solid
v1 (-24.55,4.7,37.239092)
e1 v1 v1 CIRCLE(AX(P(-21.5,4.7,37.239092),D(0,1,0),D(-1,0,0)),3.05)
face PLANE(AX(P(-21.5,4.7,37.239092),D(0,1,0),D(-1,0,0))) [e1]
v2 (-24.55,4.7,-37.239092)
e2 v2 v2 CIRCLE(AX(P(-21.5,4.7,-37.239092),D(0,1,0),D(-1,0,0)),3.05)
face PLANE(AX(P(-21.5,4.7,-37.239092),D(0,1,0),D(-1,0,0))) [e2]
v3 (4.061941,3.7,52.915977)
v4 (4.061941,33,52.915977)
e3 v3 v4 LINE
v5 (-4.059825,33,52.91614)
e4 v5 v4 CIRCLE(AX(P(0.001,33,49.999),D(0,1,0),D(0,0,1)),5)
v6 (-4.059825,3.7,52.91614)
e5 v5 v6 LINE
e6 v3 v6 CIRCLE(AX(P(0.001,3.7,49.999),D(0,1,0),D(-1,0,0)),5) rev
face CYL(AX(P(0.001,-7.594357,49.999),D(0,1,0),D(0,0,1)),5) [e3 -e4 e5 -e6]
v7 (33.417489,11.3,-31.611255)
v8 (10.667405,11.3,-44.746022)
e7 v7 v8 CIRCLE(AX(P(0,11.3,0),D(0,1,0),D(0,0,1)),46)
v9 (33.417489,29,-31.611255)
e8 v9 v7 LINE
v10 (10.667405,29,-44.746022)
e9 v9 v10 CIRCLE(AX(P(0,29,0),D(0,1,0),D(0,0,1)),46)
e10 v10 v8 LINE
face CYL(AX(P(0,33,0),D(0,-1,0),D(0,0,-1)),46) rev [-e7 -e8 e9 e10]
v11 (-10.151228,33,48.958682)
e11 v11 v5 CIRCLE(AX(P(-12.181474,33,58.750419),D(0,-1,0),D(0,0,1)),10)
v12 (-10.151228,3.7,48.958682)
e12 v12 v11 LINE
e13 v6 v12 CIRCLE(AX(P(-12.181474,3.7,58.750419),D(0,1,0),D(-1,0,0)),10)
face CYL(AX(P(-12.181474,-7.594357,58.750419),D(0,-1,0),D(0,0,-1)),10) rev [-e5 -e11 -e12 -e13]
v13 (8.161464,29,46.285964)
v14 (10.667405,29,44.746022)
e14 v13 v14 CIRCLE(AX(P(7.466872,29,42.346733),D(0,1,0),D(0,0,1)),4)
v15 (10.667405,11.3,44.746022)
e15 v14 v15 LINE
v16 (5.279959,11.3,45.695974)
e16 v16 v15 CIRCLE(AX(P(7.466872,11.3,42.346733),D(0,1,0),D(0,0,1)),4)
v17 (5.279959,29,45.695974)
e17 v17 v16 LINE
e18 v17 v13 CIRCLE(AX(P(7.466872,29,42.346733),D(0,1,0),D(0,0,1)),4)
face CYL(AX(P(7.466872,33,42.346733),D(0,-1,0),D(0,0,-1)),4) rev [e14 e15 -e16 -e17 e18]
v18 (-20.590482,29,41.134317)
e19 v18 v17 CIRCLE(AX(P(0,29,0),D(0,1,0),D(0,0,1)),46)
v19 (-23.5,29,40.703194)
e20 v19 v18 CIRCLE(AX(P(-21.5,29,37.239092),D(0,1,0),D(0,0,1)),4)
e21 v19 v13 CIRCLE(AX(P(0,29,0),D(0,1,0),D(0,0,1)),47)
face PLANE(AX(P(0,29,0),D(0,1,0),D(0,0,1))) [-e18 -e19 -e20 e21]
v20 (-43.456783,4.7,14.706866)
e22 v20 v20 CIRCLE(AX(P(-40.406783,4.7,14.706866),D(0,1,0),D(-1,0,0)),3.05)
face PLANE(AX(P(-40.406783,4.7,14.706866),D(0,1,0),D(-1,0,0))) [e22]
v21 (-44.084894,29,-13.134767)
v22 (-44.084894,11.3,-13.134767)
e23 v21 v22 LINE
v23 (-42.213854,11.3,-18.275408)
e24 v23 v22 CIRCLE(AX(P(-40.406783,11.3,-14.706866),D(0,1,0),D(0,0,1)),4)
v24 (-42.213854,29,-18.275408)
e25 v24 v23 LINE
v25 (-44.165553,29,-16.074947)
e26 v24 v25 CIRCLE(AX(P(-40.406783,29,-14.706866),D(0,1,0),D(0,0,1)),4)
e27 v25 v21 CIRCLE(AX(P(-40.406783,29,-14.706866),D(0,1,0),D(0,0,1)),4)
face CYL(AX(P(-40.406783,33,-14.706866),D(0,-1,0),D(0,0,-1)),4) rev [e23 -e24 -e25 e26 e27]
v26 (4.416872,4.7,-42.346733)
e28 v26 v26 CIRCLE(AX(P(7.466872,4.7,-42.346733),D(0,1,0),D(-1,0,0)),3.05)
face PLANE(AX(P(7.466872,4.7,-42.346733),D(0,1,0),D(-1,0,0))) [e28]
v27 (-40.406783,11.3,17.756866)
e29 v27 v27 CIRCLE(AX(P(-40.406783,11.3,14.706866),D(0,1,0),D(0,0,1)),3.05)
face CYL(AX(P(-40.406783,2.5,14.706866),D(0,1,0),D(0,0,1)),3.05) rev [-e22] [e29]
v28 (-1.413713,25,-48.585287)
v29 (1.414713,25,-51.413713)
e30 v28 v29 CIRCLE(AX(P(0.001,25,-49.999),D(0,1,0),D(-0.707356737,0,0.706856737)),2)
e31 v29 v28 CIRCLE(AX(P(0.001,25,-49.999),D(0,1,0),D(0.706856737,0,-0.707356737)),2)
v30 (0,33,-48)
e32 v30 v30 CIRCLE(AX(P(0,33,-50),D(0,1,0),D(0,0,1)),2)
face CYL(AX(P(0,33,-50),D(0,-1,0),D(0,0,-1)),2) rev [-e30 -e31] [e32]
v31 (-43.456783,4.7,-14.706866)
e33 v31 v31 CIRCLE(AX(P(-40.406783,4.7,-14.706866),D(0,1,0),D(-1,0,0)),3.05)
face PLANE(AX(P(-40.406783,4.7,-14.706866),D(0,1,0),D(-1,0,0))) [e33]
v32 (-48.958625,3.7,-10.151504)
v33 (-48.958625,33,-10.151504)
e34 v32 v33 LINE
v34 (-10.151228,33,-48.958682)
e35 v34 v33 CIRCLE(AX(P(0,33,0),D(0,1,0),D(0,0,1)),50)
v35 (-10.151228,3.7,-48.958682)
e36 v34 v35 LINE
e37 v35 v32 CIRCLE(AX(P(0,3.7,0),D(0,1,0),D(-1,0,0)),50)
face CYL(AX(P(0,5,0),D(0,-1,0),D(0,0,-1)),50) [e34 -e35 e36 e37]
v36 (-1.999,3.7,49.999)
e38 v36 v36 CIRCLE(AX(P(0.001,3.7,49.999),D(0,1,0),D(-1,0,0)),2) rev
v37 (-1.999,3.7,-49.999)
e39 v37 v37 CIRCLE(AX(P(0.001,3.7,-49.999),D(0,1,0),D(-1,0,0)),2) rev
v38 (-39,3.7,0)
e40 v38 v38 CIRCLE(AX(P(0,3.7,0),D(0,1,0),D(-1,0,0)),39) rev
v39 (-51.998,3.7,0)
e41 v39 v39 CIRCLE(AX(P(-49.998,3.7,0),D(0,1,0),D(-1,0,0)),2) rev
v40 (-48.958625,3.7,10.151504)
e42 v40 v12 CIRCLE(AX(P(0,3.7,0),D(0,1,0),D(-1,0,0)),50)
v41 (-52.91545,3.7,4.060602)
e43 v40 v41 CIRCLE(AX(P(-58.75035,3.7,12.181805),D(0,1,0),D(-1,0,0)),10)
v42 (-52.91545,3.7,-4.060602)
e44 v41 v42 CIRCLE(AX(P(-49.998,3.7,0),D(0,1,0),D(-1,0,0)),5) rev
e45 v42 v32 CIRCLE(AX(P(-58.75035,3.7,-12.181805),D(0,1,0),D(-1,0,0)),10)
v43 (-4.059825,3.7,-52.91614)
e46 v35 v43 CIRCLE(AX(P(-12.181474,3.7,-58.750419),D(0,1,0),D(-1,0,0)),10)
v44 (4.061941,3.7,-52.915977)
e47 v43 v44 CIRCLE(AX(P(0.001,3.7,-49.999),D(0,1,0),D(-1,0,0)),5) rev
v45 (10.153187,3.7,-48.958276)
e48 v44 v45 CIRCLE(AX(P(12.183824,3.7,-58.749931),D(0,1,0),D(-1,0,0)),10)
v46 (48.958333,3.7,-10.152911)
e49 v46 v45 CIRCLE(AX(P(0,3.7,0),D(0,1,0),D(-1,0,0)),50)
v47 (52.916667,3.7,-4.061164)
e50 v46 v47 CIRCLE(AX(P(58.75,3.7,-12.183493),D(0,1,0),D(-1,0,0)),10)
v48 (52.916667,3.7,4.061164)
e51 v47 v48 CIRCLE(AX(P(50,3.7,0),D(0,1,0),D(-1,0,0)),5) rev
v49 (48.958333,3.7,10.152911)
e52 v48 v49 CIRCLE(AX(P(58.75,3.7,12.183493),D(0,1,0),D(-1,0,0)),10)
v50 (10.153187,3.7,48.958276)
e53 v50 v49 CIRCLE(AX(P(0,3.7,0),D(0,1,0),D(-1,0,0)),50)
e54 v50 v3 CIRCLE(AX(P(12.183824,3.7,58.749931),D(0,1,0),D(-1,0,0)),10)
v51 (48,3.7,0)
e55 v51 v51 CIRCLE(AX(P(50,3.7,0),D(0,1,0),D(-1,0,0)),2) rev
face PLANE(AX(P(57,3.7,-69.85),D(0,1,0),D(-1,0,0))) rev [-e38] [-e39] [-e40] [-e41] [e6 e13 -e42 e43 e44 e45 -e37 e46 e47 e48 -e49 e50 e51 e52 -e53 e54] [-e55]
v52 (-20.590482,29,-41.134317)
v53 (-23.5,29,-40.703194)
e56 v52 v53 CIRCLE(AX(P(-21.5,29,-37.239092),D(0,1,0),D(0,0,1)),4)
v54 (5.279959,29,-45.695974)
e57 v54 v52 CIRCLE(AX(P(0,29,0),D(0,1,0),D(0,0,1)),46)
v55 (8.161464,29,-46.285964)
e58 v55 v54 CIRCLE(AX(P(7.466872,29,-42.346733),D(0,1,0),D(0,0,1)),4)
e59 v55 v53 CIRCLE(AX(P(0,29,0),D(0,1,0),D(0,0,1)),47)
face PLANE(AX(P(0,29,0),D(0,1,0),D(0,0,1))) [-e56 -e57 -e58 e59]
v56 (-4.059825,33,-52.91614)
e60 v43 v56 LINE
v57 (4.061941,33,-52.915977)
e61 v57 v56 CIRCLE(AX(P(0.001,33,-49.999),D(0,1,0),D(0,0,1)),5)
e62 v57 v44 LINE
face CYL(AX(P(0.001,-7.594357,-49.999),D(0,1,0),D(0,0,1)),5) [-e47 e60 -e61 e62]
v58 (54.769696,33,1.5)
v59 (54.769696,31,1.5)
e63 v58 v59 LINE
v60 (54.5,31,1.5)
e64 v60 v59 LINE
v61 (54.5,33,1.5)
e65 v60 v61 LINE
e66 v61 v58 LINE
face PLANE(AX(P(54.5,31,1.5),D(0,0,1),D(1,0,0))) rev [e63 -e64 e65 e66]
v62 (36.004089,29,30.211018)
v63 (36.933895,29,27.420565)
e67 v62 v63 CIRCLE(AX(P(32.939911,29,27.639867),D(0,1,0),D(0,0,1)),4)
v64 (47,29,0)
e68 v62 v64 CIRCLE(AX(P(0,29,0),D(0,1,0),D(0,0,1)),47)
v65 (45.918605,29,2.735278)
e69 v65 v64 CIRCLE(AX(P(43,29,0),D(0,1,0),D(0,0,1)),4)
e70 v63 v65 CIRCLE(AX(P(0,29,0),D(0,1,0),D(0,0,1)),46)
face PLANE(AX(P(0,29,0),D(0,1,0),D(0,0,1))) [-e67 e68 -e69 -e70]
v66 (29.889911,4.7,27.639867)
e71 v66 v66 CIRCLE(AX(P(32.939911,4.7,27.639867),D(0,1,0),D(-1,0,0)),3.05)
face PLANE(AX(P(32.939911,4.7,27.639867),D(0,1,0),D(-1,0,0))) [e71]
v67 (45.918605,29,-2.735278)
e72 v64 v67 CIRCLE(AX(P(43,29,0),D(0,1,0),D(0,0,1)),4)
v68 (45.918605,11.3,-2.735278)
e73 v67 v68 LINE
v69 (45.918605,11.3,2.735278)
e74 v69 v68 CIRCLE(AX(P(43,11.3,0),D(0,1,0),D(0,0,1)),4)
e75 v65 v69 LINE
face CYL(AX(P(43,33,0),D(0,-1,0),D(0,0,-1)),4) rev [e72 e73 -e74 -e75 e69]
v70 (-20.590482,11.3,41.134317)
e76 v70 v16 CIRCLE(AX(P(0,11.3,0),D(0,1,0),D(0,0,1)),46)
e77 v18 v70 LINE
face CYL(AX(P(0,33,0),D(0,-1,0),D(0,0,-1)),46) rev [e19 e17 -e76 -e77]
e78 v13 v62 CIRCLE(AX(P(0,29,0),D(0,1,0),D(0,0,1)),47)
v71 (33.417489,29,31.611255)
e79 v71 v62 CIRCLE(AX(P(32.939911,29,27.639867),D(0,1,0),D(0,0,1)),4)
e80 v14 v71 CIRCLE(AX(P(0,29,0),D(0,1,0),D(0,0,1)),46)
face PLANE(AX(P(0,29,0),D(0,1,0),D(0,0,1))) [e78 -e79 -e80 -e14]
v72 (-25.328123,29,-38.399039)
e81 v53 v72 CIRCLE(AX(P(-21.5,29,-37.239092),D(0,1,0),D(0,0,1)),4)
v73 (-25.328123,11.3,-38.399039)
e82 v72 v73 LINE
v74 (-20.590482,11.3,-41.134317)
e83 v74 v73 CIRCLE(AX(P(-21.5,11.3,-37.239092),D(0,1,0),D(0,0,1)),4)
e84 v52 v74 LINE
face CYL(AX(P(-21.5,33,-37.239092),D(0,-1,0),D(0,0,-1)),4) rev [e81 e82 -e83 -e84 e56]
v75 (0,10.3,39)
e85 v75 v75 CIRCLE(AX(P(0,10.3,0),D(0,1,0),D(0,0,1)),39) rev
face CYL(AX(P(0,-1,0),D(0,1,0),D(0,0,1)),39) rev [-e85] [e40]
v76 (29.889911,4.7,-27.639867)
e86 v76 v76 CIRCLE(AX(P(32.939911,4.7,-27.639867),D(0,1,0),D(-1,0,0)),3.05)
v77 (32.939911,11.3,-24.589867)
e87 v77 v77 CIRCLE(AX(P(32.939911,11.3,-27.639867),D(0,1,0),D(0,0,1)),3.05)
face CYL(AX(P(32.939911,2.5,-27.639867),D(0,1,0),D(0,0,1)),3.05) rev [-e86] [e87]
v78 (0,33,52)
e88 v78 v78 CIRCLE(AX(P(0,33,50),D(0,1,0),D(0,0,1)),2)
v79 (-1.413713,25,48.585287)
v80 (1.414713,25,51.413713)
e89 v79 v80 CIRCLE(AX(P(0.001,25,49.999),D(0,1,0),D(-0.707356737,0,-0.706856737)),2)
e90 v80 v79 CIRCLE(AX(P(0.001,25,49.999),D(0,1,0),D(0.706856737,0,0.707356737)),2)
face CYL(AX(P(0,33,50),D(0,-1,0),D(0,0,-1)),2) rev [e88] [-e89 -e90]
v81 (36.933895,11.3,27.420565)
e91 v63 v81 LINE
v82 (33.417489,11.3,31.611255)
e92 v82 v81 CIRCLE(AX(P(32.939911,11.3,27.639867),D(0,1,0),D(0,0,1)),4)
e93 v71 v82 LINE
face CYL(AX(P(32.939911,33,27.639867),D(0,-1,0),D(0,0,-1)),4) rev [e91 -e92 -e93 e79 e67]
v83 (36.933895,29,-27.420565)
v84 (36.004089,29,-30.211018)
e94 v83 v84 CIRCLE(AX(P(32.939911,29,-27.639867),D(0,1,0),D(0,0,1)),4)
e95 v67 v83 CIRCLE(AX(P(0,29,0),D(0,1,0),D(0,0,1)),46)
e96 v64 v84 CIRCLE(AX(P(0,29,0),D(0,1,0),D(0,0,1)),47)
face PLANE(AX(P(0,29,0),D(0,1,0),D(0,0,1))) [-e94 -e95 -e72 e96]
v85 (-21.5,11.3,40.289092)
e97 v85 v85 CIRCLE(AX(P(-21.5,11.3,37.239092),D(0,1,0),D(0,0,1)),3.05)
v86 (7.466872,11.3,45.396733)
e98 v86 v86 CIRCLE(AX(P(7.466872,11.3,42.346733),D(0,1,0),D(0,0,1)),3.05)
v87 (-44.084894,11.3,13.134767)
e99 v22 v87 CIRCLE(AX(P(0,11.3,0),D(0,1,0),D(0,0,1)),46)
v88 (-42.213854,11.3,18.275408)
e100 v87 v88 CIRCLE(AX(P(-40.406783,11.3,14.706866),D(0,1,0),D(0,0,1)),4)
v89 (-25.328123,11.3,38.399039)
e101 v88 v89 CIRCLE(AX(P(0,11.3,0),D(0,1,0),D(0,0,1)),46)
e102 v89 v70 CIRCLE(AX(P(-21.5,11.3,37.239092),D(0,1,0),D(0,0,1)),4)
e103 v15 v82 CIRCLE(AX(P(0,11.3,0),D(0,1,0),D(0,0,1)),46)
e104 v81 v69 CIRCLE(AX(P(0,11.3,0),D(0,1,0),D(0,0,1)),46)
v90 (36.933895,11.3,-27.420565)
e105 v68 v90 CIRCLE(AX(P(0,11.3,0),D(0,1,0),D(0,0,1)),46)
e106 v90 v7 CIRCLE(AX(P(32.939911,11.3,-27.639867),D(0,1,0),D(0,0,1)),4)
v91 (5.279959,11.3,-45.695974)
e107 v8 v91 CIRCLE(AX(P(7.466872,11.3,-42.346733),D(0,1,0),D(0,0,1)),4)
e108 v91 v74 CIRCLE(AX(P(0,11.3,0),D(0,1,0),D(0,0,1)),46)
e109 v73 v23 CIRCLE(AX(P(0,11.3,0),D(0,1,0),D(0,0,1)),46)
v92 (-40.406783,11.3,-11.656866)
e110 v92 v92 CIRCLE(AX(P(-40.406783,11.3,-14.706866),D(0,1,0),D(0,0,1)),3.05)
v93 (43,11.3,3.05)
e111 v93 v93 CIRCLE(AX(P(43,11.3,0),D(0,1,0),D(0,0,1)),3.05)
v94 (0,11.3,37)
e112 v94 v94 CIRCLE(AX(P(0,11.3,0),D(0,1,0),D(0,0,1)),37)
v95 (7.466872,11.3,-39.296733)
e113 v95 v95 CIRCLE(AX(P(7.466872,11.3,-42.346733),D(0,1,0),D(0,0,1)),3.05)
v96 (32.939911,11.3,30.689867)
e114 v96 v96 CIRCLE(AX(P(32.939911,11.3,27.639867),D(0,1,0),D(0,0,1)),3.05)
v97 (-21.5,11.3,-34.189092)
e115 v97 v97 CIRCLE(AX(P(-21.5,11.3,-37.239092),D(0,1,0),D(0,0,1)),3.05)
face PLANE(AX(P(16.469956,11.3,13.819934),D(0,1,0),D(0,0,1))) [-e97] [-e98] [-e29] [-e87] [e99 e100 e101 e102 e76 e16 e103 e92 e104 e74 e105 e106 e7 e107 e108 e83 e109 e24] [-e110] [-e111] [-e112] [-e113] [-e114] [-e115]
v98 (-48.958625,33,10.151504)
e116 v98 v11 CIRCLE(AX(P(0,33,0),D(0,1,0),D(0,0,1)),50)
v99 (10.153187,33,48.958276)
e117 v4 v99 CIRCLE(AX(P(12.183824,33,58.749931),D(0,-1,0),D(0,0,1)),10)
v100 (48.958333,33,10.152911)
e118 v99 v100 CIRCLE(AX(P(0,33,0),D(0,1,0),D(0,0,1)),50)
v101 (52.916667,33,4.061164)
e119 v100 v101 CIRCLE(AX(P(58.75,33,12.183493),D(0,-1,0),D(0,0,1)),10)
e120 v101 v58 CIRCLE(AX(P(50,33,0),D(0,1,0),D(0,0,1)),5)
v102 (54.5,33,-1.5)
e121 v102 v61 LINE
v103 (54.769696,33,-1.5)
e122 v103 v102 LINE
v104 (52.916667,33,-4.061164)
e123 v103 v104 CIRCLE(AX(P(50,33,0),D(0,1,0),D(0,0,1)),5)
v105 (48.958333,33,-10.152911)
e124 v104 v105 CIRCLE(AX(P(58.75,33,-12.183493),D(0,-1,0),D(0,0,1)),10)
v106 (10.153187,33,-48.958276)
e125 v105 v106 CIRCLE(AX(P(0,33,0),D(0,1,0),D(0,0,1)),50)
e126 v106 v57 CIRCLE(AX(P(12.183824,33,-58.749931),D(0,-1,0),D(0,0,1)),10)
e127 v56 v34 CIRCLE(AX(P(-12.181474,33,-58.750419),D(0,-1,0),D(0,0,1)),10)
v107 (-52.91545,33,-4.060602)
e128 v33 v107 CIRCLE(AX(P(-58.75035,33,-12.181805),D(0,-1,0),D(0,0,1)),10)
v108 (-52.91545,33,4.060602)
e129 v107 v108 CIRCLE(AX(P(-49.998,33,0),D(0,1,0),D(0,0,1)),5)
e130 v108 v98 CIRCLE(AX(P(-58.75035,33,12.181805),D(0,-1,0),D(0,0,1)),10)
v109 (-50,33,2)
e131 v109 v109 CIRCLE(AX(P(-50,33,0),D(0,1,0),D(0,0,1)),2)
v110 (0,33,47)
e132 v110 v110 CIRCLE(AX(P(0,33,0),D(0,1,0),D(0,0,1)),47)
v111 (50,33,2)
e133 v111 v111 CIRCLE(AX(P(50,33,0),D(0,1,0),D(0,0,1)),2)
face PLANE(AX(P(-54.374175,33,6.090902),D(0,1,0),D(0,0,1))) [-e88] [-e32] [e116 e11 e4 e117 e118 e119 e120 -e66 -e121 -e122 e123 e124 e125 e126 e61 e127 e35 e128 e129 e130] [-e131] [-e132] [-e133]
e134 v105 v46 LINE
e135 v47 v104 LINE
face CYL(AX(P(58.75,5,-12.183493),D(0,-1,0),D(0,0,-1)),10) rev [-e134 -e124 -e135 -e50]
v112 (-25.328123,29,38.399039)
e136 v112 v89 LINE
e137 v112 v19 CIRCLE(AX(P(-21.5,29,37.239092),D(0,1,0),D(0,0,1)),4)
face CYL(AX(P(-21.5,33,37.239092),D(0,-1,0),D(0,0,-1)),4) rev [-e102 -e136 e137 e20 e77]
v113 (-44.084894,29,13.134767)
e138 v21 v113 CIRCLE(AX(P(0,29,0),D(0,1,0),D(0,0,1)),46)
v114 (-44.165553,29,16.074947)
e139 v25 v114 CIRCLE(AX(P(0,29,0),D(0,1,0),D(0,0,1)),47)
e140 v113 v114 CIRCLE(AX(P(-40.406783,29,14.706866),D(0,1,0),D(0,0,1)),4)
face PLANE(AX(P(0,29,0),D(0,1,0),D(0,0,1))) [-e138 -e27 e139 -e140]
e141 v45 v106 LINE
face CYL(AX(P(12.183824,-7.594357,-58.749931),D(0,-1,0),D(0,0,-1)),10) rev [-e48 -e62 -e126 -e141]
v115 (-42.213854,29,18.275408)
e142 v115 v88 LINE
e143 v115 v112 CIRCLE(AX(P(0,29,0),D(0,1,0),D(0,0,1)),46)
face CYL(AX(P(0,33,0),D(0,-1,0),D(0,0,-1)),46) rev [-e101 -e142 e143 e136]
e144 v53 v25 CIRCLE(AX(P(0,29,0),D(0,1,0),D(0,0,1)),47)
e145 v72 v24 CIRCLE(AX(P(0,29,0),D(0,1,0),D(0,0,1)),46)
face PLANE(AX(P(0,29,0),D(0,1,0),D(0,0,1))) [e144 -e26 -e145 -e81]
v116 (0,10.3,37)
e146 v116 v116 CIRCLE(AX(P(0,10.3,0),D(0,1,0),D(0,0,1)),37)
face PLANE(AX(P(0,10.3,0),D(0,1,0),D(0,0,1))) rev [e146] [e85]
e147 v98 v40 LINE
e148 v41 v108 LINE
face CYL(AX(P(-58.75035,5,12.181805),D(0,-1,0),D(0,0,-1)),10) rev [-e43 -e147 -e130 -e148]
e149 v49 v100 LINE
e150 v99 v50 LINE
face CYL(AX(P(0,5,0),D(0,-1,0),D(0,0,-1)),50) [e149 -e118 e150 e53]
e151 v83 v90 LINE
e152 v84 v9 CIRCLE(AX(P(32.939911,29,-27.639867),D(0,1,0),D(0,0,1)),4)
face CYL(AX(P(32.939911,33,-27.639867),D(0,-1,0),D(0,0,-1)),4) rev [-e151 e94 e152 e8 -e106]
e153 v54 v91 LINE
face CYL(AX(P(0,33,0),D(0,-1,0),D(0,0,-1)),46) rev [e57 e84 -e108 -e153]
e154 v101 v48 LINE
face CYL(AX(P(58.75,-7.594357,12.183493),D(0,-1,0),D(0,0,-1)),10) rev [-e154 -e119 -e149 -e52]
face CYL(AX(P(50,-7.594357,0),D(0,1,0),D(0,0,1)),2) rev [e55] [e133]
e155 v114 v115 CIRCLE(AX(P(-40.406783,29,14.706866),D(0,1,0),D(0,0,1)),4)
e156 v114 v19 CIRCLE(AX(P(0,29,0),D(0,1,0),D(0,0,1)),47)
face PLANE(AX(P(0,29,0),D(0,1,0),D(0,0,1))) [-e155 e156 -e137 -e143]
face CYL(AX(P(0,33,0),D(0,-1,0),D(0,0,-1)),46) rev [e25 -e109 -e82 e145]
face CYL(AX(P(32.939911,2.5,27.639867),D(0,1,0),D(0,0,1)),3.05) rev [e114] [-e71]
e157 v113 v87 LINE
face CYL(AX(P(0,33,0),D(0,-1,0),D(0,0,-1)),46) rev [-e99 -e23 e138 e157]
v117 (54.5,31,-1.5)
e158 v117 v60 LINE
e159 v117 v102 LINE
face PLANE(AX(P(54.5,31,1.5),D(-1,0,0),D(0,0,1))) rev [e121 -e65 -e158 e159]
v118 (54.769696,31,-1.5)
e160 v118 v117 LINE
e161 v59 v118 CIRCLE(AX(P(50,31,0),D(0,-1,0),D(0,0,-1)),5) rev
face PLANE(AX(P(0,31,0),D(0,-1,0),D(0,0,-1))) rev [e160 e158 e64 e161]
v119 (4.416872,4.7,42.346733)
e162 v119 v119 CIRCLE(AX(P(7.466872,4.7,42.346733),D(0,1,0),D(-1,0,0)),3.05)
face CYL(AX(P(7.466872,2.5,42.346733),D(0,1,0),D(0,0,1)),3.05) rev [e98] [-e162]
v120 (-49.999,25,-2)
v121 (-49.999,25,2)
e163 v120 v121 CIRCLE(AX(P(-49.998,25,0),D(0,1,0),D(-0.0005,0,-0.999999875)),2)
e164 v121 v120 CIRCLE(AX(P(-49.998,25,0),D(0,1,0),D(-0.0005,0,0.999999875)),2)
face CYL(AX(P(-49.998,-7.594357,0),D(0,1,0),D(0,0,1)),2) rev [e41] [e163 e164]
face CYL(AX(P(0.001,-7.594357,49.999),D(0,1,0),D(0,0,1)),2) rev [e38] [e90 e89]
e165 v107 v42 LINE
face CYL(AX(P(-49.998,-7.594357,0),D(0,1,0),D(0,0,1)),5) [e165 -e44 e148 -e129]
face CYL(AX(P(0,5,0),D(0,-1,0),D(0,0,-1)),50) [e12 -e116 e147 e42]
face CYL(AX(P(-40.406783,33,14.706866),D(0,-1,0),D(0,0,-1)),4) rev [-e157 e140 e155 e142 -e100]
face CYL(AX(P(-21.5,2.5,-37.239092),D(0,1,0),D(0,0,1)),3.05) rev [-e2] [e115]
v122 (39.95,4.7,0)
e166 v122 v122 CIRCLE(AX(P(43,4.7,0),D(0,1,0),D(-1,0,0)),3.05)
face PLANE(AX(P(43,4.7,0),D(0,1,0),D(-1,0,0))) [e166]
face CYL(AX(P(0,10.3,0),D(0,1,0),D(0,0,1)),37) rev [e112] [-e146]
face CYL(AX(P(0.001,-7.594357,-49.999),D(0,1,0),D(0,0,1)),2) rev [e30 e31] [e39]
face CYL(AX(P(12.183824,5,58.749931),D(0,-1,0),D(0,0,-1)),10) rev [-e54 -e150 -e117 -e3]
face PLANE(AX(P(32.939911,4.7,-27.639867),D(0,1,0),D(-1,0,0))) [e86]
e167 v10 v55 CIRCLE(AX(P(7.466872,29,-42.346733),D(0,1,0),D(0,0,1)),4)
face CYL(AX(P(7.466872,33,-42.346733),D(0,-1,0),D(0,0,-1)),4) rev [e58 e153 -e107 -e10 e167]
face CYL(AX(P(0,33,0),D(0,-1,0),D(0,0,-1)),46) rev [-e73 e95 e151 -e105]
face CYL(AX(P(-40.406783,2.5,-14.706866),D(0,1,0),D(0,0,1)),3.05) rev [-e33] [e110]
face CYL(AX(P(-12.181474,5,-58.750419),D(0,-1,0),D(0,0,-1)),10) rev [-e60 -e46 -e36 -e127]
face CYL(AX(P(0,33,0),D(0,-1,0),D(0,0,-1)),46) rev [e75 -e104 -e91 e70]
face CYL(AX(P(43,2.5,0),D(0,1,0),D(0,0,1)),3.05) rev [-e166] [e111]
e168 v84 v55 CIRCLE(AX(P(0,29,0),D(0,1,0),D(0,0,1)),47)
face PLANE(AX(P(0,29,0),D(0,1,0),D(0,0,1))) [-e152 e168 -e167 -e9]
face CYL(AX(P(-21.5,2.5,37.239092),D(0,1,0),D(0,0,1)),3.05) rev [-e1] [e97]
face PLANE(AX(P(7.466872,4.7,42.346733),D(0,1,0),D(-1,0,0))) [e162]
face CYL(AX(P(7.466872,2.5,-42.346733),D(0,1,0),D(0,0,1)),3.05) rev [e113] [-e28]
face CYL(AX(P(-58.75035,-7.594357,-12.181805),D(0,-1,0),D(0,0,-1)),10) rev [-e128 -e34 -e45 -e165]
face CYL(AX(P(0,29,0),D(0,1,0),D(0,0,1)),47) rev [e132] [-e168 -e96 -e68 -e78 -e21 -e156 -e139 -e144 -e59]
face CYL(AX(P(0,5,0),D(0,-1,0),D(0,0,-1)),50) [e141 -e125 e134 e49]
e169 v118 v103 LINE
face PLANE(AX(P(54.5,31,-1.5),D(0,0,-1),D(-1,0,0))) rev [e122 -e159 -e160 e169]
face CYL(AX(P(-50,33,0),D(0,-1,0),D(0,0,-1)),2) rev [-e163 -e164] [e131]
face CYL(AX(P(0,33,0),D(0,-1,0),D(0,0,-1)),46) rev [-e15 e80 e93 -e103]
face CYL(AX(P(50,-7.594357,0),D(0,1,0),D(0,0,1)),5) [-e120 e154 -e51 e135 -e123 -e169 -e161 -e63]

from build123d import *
from build123d.topology import SkipClean

# Parameters (mm, degrees)
SKETCH1_R            = 50
BOSS_EXTRUDE1_DEPTH  = 5
SKETCH2_R            = 3
BOSS_EXTRUDE2_DEPTH  = 30
SKETCH3_R            = 50
BOSS_EXTRUDE3_DEPTH  = 28
SKETCH4_R            = 39
CUT_EXTRUDE1_DEPTH   = 6
SKETCH5_R            = 3
CUT_EXTRUDE2_DEPTH   = 44
SKETCH6_R            = 50
SKETCH6_R_2          = 39
BOSS_EXTRUDE4_DEPTH  = 3
CUT_EXTRUDE3_START   = -4
SKETCH7_R            = 47
SKETCH7_R_2          = 46
CUT_EXTRUDE3_DEPTH   = 4
BOSS_EXTRUDE5_START  = -1
SKETCH8_R            = 39
SKETCH8_R_2          = 37
BOSS_EXTRUDE5_DEPTH  = 1
SKETCH9_R            = 5
SKETCH9_R_2          = 2
BOSS_EXTRUDE6_DEPTH  = 33
SKETCH10_R           = 3.05
CUT_EXTRUDE6_DEPTH   = 2.5
SKETCH11_R           = 47.15
CUT_EXTRUDE7_DEPTH   = 4
SKETCH12_R           = 39
SKETCH12_R_2         = 3.05
BOSS_EXTRUDE7_DEPTH  = 6.3
SKETCH13_R           = 39
SKETCH13_R_2         = 37
BOSS_EXTRUDE8_DEPTH  = 1
SKETCH14_W           = 114
SKETCH14_H           = 3
CUT_EXTRUDE8_DEPTH   = 59.5
SKETCH15_R           = 39
SKETCH15_R_2         = 2
BOSS_EXTRUDE9_DEPTH  = 1
SKETCH16_R           = 3.05
BOSS_EXTRUDE10_DEPTH = 0.7
SKETCH17_W           = 114.080184059
SKETCH17_H           = 0.7
CUT_EXTRUDE9_DEPTH   = 69.85
CUT_EXTRUDE10_START  = -8
CUT_EXTRUDE10_DEPTH  = 8
CUT_EXTRUDE12_START  = -21.3
SKETCH20_R           = 57
SKETCH20_R_2         = 50
CUT_EXTRUDE12_DEPTH  = 21.3
BOSS_EXTRUDE11_START = -21.3
BOSS_EXTRUDE11_DEPTH = 21.3
CUT_EXTRUDE13_START  = -21.3
CUT_EXTRUDE13_DEPTH  = 21.3
FILLET1_R            = 10
SKETCH23_R           = 2
BOSS_EXTRUDE12_DEPTH = 8
CUT_EXTRUDE14_START  = -4
SKETCH24_R           = 47
SKETCH24_R_2         = 46
CUT_EXTRUDE14_DEPTH  = 4
SKETCH25_W           = 1
SKETCH25_H           = 3
CUT_EXTRUDE15_DEPTH  = 2


# Read off the part's stored shape, not the designer's step: Cut-Extrude13
with BuildPart() as part:
    # Sketch1 → Boss-Extrude1 (new body)
    with BuildSketch(Plane(origin=(0, 0, 0), x_dir=(1, 0, 0), z_dir=(0, 1, 0))):
        with Locations(Location((0, 0, 0), (0, 0, 270))):
            Circle(SKETCH1_R)
    extrude(amount=BOSS_EXTRUDE1_DEPTH)

    # Sketch2 → Boss-Extrude2 (add)
    with BuildSketch(Plane(origin=(0, 5, 0), x_dir=(1, 0, 0), z_dir=(0, 1, 0))):
        with Locations(Location((43, 0, 0), (0, 0, 270))):
            Circle(SKETCH2_R)
        with Locations(Location((32.939911054, -27.639867217, 0), (0, 0, 270))):
            Circle(SKETCH2_R)
        with Locations(Location((7.46687164, -42.34673338, 0), (0, 0, 270))):
            Circle(SKETCH2_R)
        with Locations(Location((-21.5, -37.239092363, 0), (0, 0, 270))):
            Circle(SKETCH2_R)
        with Locations(Location((-40.406782694, -14.706866163, 0), (0, 0, 270))):
            Circle(SKETCH2_R)
        with Locations(Location((-40.406782694, 14.706866163, 0), (0, 0, 270))):
            Circle(SKETCH2_R)
        with Locations(Location((-21.5, 37.239092363, 0), (0, 0, 270))):
            Circle(SKETCH2_R)
        with Locations(Location((7.46687164, 42.34673338, 0), (0, 0, 270))):
            Circle(SKETCH2_R)
        with Locations(Location((32.939911054, 27.639867217, 0), (0, 0, 270))):
            Circle(SKETCH2_R)
    extrude(amount=BOSS_EXTRUDE2_DEPTH)

    # Sketch3 → Boss-Extrude3 (add)
    with BuildSketch(Plane(origin=(0, 5, 0), x_dir=(1, 0, 0), z_dir=(0, 1, 0))):
        with Locations(Location((0, 0, 0), (0, 0, 270))):
            Circle(SKETCH3_R)
        with BuildLine():
            ThreePointArc((45.918604651, 2.735278211), (43.225860556, 15.732926593), (36.933894872, 27.42056545))
            ThreePointArc((36.933894872, 27.42056545), (36.004088827, 30.211017655), (33.417488986, 31.611254798))
            ThreePointArc((33.417488986, 31.611254798), (23, 39.837168574), (10.667405207, 44.746021791))
            ThreePointArc((10.667405207, 44.746021791), (8.16146435, 46.285964392), (5.27995883, 45.695973945))
            ThreePointArc((5.27995883, 45.695973945), (-7.987816173, 45.301156639), (-20.590481909, 41.13431724))
            ThreePointArc((-20.590481909, 41.13431724), (-23.5, 40.703193978), (-25.328122743, 38.399039029))
            ThreePointArc((-25.328122743, 38.399039029), (-35.238044383, 29.568230046), (-42.213853702, 18.275408495))
            ThreePointArc((-42.213853702, 18.275408495), (-44.165553177, 16.074946736), (-44.084894193, 13.134766994))
            ThreePointArc((-44.084894193, 13.134766994), (-46, 0), (-44.084894193, -13.134766994))
            ThreePointArc((-44.084894193, -13.134766994), (-44.165553177, -16.074946736), (-42.213853702, -18.275408495))
            ThreePointArc((-42.213853702, -18.275408495), (-35.238044383, -29.568230046), (-25.328122743, -38.399039029))
            ThreePointArc((-25.328122743, -38.399039029), (-23.5, -40.703193978), (-20.590481909, -41.13431724))
            ThreePointArc((-20.590481909, -41.13431724), (-7.987816173, -45.301156639), (5.27995883, -45.695973945))
            ThreePointArc((5.27995883, -45.695973945), (8.16146435, -46.285964392), (10.667405207, -44.746021791))
            ThreePointArc((10.667405207, -44.746021791), (23, -39.837168574), (33.417488986, -31.611254798))
            ThreePointArc((33.417488986, -31.611254798), (36.004088827, -30.211017655), (36.933894872, -27.42056545))
            ThreePointArc((36.933894872, -27.42056545), (43.225860556, -15.732926593), (45.918604651, -2.735278211))
            ThreePointArc((45.918604651, -2.735278211), (47, 0), (45.918604651, 2.735278211))
        make_face(mode=Mode.SUBTRACT)
    extrude(amount=BOSS_EXTRUDE3_DEPTH)

    # Sketch4 → Cut-Extrude1 (cut)
    with BuildSketch(Plane(origin=(0, 5, 0), x_dir=(1, 0, 0), z_dir=(0, 1, 0))):
        with Locations(Location((0, 0, 0), (0, 0, 270))):
            Circle(SKETCH4_R)
    extrude(amount=-CUT_EXTRUDE1_DEPTH, mode=Mode.SUBTRACT)

    # Sketch5 → Cut-Extrude2 (cut, symmetric)
    with BuildSketch(Plane(origin=(0, 5, 0), x_dir=(1, 0, 0), z_dir=(0, 1, 0))):
        with Locations(Location((43, 0, 0), (0, 0, 270))):
            Circle(SKETCH5_R)
        with Locations(Location((32.939911054, -27.639867217, 0), (0, 0, 270))):
            Circle(SKETCH5_R)
        with Locations(Location((7.46687164, -42.34673338, 0), (0, 0, 270))):
            Circle(SKETCH5_R)
        with Locations(Location((-21.5, -37.239092363, 0), (0, 0, 270))):
            Circle(SKETCH5_R)
        with Locations(Location((-40.406782694, -14.706866163, 0), (0, 0, 270))):
            Circle(SKETCH5_R)
        with Locations(Location((-40.406782694, 14.706866163, 0), (0, 0, 270))):
            Circle(SKETCH5_R)
        with Locations(Location((-21.5, 37.239092363, 0), (0, 0, 270))):
            Circle(SKETCH5_R)
        with Locations(Location((7.46687164, 42.34673338, 0), (0, 0, 270))):
            Circle(SKETCH5_R)
        with Locations(Location((32.939911054, 27.639867217, 0), (0, 0, 270))):
            Circle(SKETCH5_R)
    extrude(amount=CUT_EXTRUDE2_DEPTH, both=True, mode=Mode.SUBTRACT)

    # Sketch6 → Boss-Extrude4 (add)
    with BuildSketch(Plane.XZ):
        with Locations(Location((0, 0, 0), (0, 0, 90))):
            Circle(SKETCH6_R)
        with Locations(Location((0, 0, 0), (0, 0, 90))):
            Circle(SKETCH6_R_2, mode=Mode.SUBTRACT)
    extrude(amount=-BOSS_EXTRUDE4_DEPTH)

    # Sketch7 → Cut-Extrude3 (cut)
    with BuildSketch(Plane(origin=(0, 33, 0), x_dir=(1, 0, 0), z_dir=(0, 1, 0)).offset(CUT_EXTRUDE3_START)):
        with Locations(Location((0, 0, 0), (0, 0, 270))):
            Circle(SKETCH7_R)
        Circle(SKETCH7_R_2, mode=Mode.SUBTRACT)
    extrude(amount=CUT_EXTRUDE3_DEPTH, mode=Mode.SUBTRACT)

    # Sketch8 → Boss-Extrude5 (add)
    with BuildSketch(Plane.XZ.offset(BOSS_EXTRUDE5_START)):
        with Locations(Location((0, 0, 0), (0, 0, 90))):
            Circle(SKETCH8_R)
        with Locations(Location((0, 0, 0), (0, 0, 270))):
            Circle(SKETCH8_R_2, mode=Mode.SUBTRACT)
    extrude(amount=BOSS_EXTRUDE5_DEPTH)

    # Sketch9 → Boss-Extrude6 (add)
    # profile 1 of 4: a face of its own
    with BuildSketch(Plane(origin=(0, 33, 0), x_dir=(1, 0, 0), z_dir=(0, 1, 0))):
        with Locations((52, 0)):
            Circle(SKETCH9_R)
        with Locations(Location((52, 0, 0), (0, 0, 270))):
            Circle(SKETCH9_R_2, mode=Mode.SUBTRACT)
    # profile 2 of 4: a face of its own
    with BuildSketch(Plane(origin=(0, 33, 0), x_dir=(1, 0, 0), z_dir=(0, 1, 0))):
        with Locations((-52, 0)):
            Circle(SKETCH9_R)
        with Locations(Location((-52, 0, 0), (0, 0, 270))):
            Circle(SKETCH9_R_2, mode=Mode.SUBTRACT)
    # profile 3 of 4: a face of its own
    with BuildSketch(Plane(origin=(0, 33, 0), x_dir=(1, 0, 0), z_dir=(0, 1, 0))):
        with Locations((0, 52)):
            Circle(SKETCH9_R)
        with Locations(Location((0, 52, 0), (0, 0, 270))):
            Circle(SKETCH9_R_2, mode=Mode.SUBTRACT)
    # profile 4 of 4: a face of its own
    with BuildSketch(Plane(origin=(0, 33, 0), x_dir=(1, 0, 0), z_dir=(0, 1, 0))):
        with Locations((0, -52)):
            Circle(SKETCH9_R)
        with Locations(Location((0, -52, 0), (0, 0, 270))):
            Circle(SKETCH9_R_2, mode=Mode.SUBTRACT)
    extrude(amount=-BOSS_EXTRUDE6_DEPTH)

    # Sketch10 → Cut-Extrude6 (cut)
    with BuildSketch(Plane(origin=(0, 5, 0), x_dir=(1, 0, 0), z_dir=(0, 1, 0))):
        with Locations(Location((32.939911054, -27.639867217, 0), (0, 0, 270))):
            Circle(SKETCH10_R)
        with Locations(Location((43, 0, 0), (0, 0, 270))):
            Circle(SKETCH10_R)
        with Locations(Location((7.46687164, -42.34673338, 0), (0, 0, 270))):
            Circle(SKETCH10_R)
        with Locations(Location((-21.5, -37.239092363, 0), (0, 0, 270))):
            Circle(SKETCH10_R)
        with Locations(Location((-40.406782694, -14.706866163, 0), (0, 0, 270))):
            Circle(SKETCH10_R)
        with Locations(Location((-40.406782694, 14.706866163, 0), (0, 0, 270))):
            Circle(SKETCH10_R)
        with Locations(Location((-21.5, 37.239092363, 0), (0, 0, 270))):
            Circle(SKETCH10_R)
        with Locations(Location((7.46687164, 42.34673338, 0), (0, 0, 270))):
            Circle(SKETCH10_R)
        with Locations(Location((32.939911054, 27.639867217, 0), (0, 0, 270))):
            Circle(SKETCH10_R)
    extrude(amount=-CUT_EXTRUDE6_DEPTH, mode=Mode.SUBTRACT)

    # Sketch11 → Cut-Extrude7 (cut)
    with BuildSketch(Plane(origin=(0, 33, 0), x_dir=(1, 0, 0), z_dir=(0, 1, 0))):
        with Locations(Location((0, 0, 0), (0, 0, 270))):
            Circle(SKETCH11_R)
    extrude(amount=-CUT_EXTRUDE7_DEPTH, mode=Mode.SUBTRACT)

    # Sketch12 → Boss-Extrude7 (add)
    with BuildSketch(Plane(origin=(0, 5, 0), x_dir=(1, 0, 0), z_dir=(0, 1, 0))):
        with BuildLine():
            ThreePointArc((36.933894872, -27.42056545), (43.225860556, -15.732926593), (45.918604651, -2.735278211))
            ThreePointArc((45.918604651, -2.735278211), (47, 0), (45.918604651, 2.735278211))
            ThreePointArc((45.918604651, 2.735278211), (43.225860556, 15.732926593), (36.933894872, 27.42056545))
            ThreePointArc((36.933894872, 27.42056545), (36.004088827, 30.211017655), (33.417488986, 31.611254798))
            ThreePointArc((33.417488986, 31.611254798), (23, 39.837168574), (10.667405207, 44.746021791))
            ThreePointArc((10.667405207, 44.746021791), (8.16146435, 46.285964392), (5.27995883, 45.695973945))
            ThreePointArc((5.27995883, 45.695973945), (-7.987816173, 45.301156639), (-20.590481909, 41.13431724))
            ThreePointArc((-20.590481909, 41.13431724), (-23.5, 40.703193978), (-25.328122743, 38.399039029))
            ThreePointArc((-25.328122743, 38.399039029), (-35.238044383, 29.568230046), (-42.213853702, 18.275408495))
            ThreePointArc((-42.213853702, 18.275408495), (-44.165553177, 16.074946736), (-44.084894193, 13.134766994))
            ThreePointArc((-44.084894193, 13.134766994), (-46, 0), (-44.084894193, -13.134766994))
            ThreePointArc((-44.084894193, -13.134766994), (-44.165553177, -16.074946736), (-42.213853702, -18.275408495))
            ThreePointArc((-42.213853702, -18.275408495), (-35.238044383, -29.568230046), (-25.328122743, -38.399039029))
            ThreePointArc((-25.328122743, -38.399039029), (-23.5, -40.703193978), (-20.590481909, -41.13431724))
            ThreePointArc((-20.590481909, -41.13431724), (-7.987816173, -45.301156639), (5.27995883, -45.695973945))
            ThreePointArc((5.27995883, -45.695973945), (8.16146435, -46.285964392), (10.667405207, -44.746021791))
            ThreePointArc((10.667405207, -44.746021791), (23, -39.837168574), (33.417488986, -31.611254798))
            ThreePointArc((33.417488986, -31.611254798), (36.004088827, -30.211017655), (36.933894872, -27.42056545))
        make_face()
        with Locations(Location((0, 0, 0), (0, 0, 270))):
            Circle(SKETCH12_R, mode=Mode.SUBTRACT)
        with Locations(Location((32.939911054, -27.639867217, 0), (0, 0, 270))):
            Circle(SKETCH12_R_2, mode=Mode.SUBTRACT)
        with Locations(Location((43, 0, 0), (0, 0, 270))):
            Circle(SKETCH12_R_2, mode=Mode.SUBTRACT)
        with Locations(Location((7.46687164, -42.34673338, 0), (0, 0, 270))):
            Circle(SKETCH12_R_2, mode=Mode.SUBTRACT)
        with Locations(Location((-21.5, -37.239092363, 0), (0, 0, 270))):
            Circle(SKETCH12_R_2, mode=Mode.SUBTRACT)
        with Locations(Location((-40.406782694, -14.706866163, 0), (0, 0, 270))):
            Circle(SKETCH12_R_2, mode=Mode.SUBTRACT)
        with Locations(Location((-40.406782694, 14.706866163, 0), (0, 0, 270))):
            Circle(SKETCH12_R_2, mode=Mode.SUBTRACT)
        with Locations(Location((-21.5, 37.239092363, 0), (0, 0, 270))):
            Circle(SKETCH12_R_2, mode=Mode.SUBTRACT)
        with Locations(Location((7.46687164, 42.34673338, 0), (0, 0, 270))):
            Circle(SKETCH12_R_2, mode=Mode.SUBTRACT)
        with Locations(Location((32.939911054, 27.639867217, 0), (0, 0, 270))):
            Circle(SKETCH12_R_2, mode=Mode.SUBTRACT)
    extrude(amount=BOSS_EXTRUDE7_DEPTH)

    # Sketch13 → Boss-Extrude8 (add)
    with BuildSketch(Plane(origin=(0, 11.3, 0), x_dir=(1, 0, 0), z_dir=(0, 1, 0))):
        with Locations(Location((0, 0, 0), (0, 0, 270))):
            Circle(SKETCH13_R)
        with Locations(Location((0, 0, 0), (0, 0, 90))):
            Circle(SKETCH13_R_2, mode=Mode.SUBTRACT)
    extrude(amount=-BOSS_EXTRUDE8_DEPTH)

    # Sketch14 → Cut-Extrude8 (cut, symmetric)
    with BuildSketch(Plane.XY):
        with Locations((0, 1.5)):
            Rectangle(SKETCH14_W, SKETCH14_H)
    extrude(amount=CUT_EXTRUDE8_DEPTH, both=True, mode=Mode.SUBTRACT)

    # Sketch15 → Boss-Extrude9 (add)
    with BuildSketch(Plane.XZ.offset(-3)):
        with BuildLine():
            ThreePointArc((4.489046086, -49.798076923), (35.355339059, -35.355339059), (49.798076923, -4.489046086))
            ThreePointArc((49.798076923, -4.489046086), (57, 0), (49.798076923, 4.489046086))
            ThreePointArc((49.798076923, 4.489046086), (35.355339059, 35.355339059), (4.489046086, 49.798076923))
            ThreePointArc((4.489046086, 49.798076923), (0, 57), (-4.489046086, 49.798076923))
            ThreePointArc((-4.489046086, 49.798076923), (-35.355339059, 35.355339059), (-49.798076923, 4.489046086))
            ThreePointArc((-49.798076923, 4.489046086), (-57, 0), (-49.798076923, -4.489046086))
            ThreePointArc((-49.798076923, -4.489046086), (-35.355339059, -35.355339059), (-4.489046086, -49.798076923))
            ThreePointArc((-4.489046086, -49.798076923), (0, -57), (4.489046086, -49.798076923))
        make_face()
        with Locations(Location((0, 0, 0), (0, 0, 90))):
            Circle(SKETCH15_R, mode=Mode.SUBTRACT)
        with Locations(Location((0, -52, 0), (0, 0, 90))):
            Circle(SKETCH15_R_2, mode=Mode.SUBTRACT)
        with Locations(Location((52, 0, 0), (0, 0, 90))):
            Circle(SKETCH15_R_2, mode=Mode.SUBTRACT)
        with Locations(Location((-52, 0, 0), (0, 0, 180))):
            Circle(SKETCH15_R_2, mode=Mode.SUBTRACT)
        with Locations(Location((0, 52, 0), (0, 0, 180))):
            Circle(SKETCH15_R_2, mode=Mode.SUBTRACT)
    extrude(amount=-BOSS_EXTRUDE9_DEPTH)

    # Sketch16 → Boss-Extrude10 (add)
    with BuildSketch(Plane(origin=(0, 4, 0), x_dir=(1, 0, 0), z_dir=(0, 1, 0))):
        with Locations(Location((32.939911054, -27.639867217, 0), (0, 0, 270))):
            Circle(SKETCH16_R)
        with Locations(Location((43, 0, 0), (0, 0, 270))):
            Circle(SKETCH16_R)
        with Locations(Location((7.46687164, -42.34673338, 0), (0, 0, 270))):
            Circle(SKETCH16_R)
        with Locations(Location((-21.5, -37.239092363, 0), (0, 0, 270))):
            Circle(SKETCH16_R)
        with Locations(Location((-40.406782694, -14.706866163, 0), (0, 0, 270))):
            Circle(SKETCH16_R)
        with Locations(Location((-40.406782694, 14.706866163, 0), (0, 0, 270))):
            Circle(SKETCH16_R)
        with Locations(Location((-21.5, 37.239092363, 0), (0, 0, 270))):
            Circle(SKETCH16_R)
        with Locations(Location((7.46687164, 42.34673338, 0), (0, 0, 270))):
            Circle(SKETCH16_R)
        with Locations(Location((32.939911054, 27.639867217, 0), (0, 0, 270))):
            Circle(SKETCH16_R)
    extrude(amount=BOSS_EXTRUDE10_DEPTH)

    # Sketch17 → Cut-Extrude9 (cut, symmetric)
    with BuildSketch(Plane.XY):
        with Locations((-0.04009203, 3.35)):
            Rectangle(SKETCH17_W, SKETCH17_H)
    extrude(amount=CUT_EXTRUDE9_DEPTH, both=True, mode=Mode.SUBTRACT)

    # Sketch18 → Cut-Extrude10 (cut)
    with BuildSketch(Plane(origin=(0, 33, 0), x_dir=(1, 0, 0), z_dir=(0, 1, 0)).offset(CUT_EXTRUDE10_START)):
        with BuildLine():
            ThreePointArc((4.489046086, -49.798076923), (35.355339059, -35.355339059), (49.798076923, -4.489046086))
            ThreePointArc((49.798076923, -4.489046086), (57, 0), (49.798076923, 4.489046086))
            ThreePointArc((49.798076923, 4.489046086), (35.355339059, 35.355339059), (4.489046086, 49.798076923))
            ThreePointArc((4.489046086, 49.798076923), (0, 57), (-4.489046086, 49.798076923))
            ThreePointArc((-4.489046086, 49.798076923), (-35.355339059, 35.355339059), (-49.798076923, 4.489046086))
            ThreePointArc((-49.798076923, 4.489046086), (-57, 0), (-49.798076923, -4.489046086))
            ThreePointArc((-49.798076923, -4.489046086), (-35.355339059, -35.355339059), (-4.489046086, -49.798076923))
            ThreePointArc((-4.489046086, -49.798076923), (0, -57), (4.489046086, -49.798076923))
        make_face()
    extrude(amount=CUT_EXTRUDE10_DEPTH, mode=Mode.SUBTRACT)

    # Sketch20 → Cut-Extrude12 (cut)
    with BuildSketch(Plane(origin=(0, 25, 0), x_dir=(1, 0, 0), z_dir=(0, 1, 0)).offset(CUT_EXTRUDE12_START)):
        Circle(SKETCH20_R)
        with Locations(Location((0, 0, 0), (0, 0, 180))):
            Circle(SKETCH20_R_2, mode=Mode.SUBTRACT)
    extrude(amount=CUT_EXTRUDE12_DEPTH, mode=Mode.SUBTRACT)

    # Sketch21 → Boss-Extrude11 (add)
    with BuildSketch(Plane(origin=(0, 25, 0), x_dir=(1, 0, 0), z_dir=(0, 1, 0)).offset(BOSS_EXTRUDE11_START)):
        with BuildLine():
            ThreePointArc((49.96, 1.99959996), (51.4, 1.428285686), (52, 0))
            ThreePointArc((52, 0), (51.4, -1.428285686), (49.96, -1.99959996))
            ThreePointArc((49.96, -1.99959996), (49.877472397, -3.498249168), (49.75, -4.993746089))
            ThreePointArc((49.75, -4.993746089), (55, 0), (49.75, 4.993746089))
            ThreePointArc((49.75, 4.993746089), (49.877472397, 3.498249168), (49.96, 1.99959996))
        make_face()
        with BuildLine():
            ThreePointArc((-4.992800781, -49.750094878), (0.001100002, -54.998999999), (4.994790821, -49.749895122))
            ThreePointArc((4.994790821, -49.749895122), (3.499281509, -49.877399982), (2.000618918, -49.959959207))
            ThreePointArc((2.000618918, -49.959959207), (2.000904727, -49.979478673), (2.001, -49.999))
            ThreePointArc((2.001, -49.999), (-0.018481328, -51.998905117), (-1.998620478, -49.960039193))
            ThreePointArc((-1.998620478, -49.960039193), (-3.497286371, -49.877539916), (-4.992800781, -49.750094878))
        make_face()
        with BuildLine():
            ThreePointArc((-49.95999844, 1.999638938), (-49.877467544, 3.498318366), (-49.74999004, 4.993845318))
            ThreePointArc((-49.74999004, 4.993845318), (-54.998, 0), (-49.74999004, -4.993845318))
            ThreePointArc((-49.74999004, -4.993845318), (-49.877467544, -3.498318366), (-49.95999844, -1.999638938))
            ThreePointArc((-49.95999844, -1.999638938), (-51.998, 0), (-49.95999844, 1.999638938))
        make_face()
        with BuildLine():
            ThreePointArc((2.000618918, 49.959959207), (3.499281509, 49.877399982), (4.994790821, 49.749895122))
            ThreePointArc((4.994790821, 49.749895122), (0.001100002, 54.998999999), (-4.992800781, 49.750094878))
            ThreePointArc((-4.992800781, 49.750094878), (-3.497286371, 49.877539916), (-1.998620478, 49.960039193))
            ThreePointArc((-1.998620478, 49.960039193), (-0.018481328, 51.998905117), (2.001, 49.999))
            ThreePointArc((2.001, 49.999), (2.000904727, 49.979478673), (2.000618918, 49.959959207))
        make_face()
    extrude(amount=BOSS_EXTRUDE11_DEPTH)

    # Cut-Extrude13 outline → Cut-Extrude13 (cut)
    with SkipClean():  # the faces are left unmerged after this step: merging them gives an invalid solid
        with BuildSketch(Plane(origin=(0, 25, 0), x_dir=(1, 0, 0), z_dir=(0, 1, 0)).offset(CUT_EXTRUDE13_START)):
            with BuildLine():
                ThreePointArc((49.96, -1.99959996), (50, 0), (49.96, 1.99959996))
                ThreePointArc((49.96, 1.99959996), (48, 0), (49.96, -1.99959996))
            make_face()
            with BuildLine():
                ThreePointArc((-1.998620478, -49.960039193), (0.00100002, -49.99999999), (2.000618918, -49.959959207))
                ThreePointArc((2.000618918, -49.959959207), (0.000959999, -47.999), (-1.998620478, -49.960039193))
            make_face()
            with BuildLine():
                ThreePointArc((-49.95999844, -1.999638938), (-47.998, 0), (-49.95999844, 1.999638938))
                ThreePointArc((-49.95999844, 1.999638938), (-50, 0), (-49.95999844, -1.999638938))
            make_face()
            with BuildLine():
                ThreePointArc((2.000618918, 49.959959207), (0.00100002, 49.99999999), (-1.998620478, 49.960039193))
                ThreePointArc((-1.998620478, 49.960039193), (0.000959999, 47.999), (2.000618918, 49.959959207))
            make_face()
        extrude(amount=CUT_EXTRUDE13_DEPTH, mode=Mode.SUBTRACT)

    # Fillet1
    fillet1_edges = [part.edges().sort_by_distance(p)[0] for p in [
        (49.75, 14.35, 4.993746089),
        (49.75, 14.35, -4.993746089),
        (-4.992800781, 14.35, 49.750094878),
        (4.994790821, 14.35, 49.749895122),
        (-49.74999004, 14.35, -4.993845318),
        (-49.74999004, 14.35, 4.993845318),
        (4.994790821, 14.35, -49.749895122),
        (-4.992800781, 14.35, -49.750094878),
    ]]
    fillet(fillet1_edges, radius=FILLET1_R)

    # Sketch23 → Boss-Extrude12 (add)
    with SkipClean():  # the faces are left unmerged after this step: merging them gives an invalid solid
        with BuildSketch(Plane(origin=(0, 25, 0), x_dir=(1, 0, 0), z_dir=(0, 1, 0))):
            with BuildLine():
                ThreePointArc((-48.958625045, -10.151504012), (-35.355239503, -35.355438615), (-10.151228289, -48.958682215))
                ThreePointArc((-10.151228289, -48.958682215), (-6.733482579, -50.364752909), (-4.059824649, -52.916139553))
                ThreePointArc((-4.059824649, -52.916139553), (0.001100002, -54.998999999), (4.061941334, -52.915977114))
                ThreePointArc((4.061941334, -52.915977114), (6.735497204, -50.364483524), (10.153186668, -48.958276118))
                ThreePointArc((10.153186668, -48.958276118), (35.355438677, -35.355239441), (48.958333333, -10.152910776))
                ThreePointArc((48.958333333, -10.152910776), (50.364745084, -6.734869252), (52.916666667, -4.06116431))
                ThreePointArc((52.916666667, -4.06116431), (55, 0), (52.916666667, 4.06116431))
                ThreePointArc((52.916666667, 4.06116431), (50.364745084, 6.734869252), (48.958333333, 10.152910776))
                ThreePointArc((48.958333333, 10.152910776), (35.355438677, 35.355239441), (10.153186668, 48.958276118))
                ThreePointArc((10.153186668, 48.958276118), (6.735497204, 50.364483524), (4.061941334, 52.915977114))
                ThreePointArc((4.061941334, 52.915977114), (0.001100002, 54.998999999), (-4.059824649, 52.916139553))
                ThreePointArc((-4.059824649, 52.916139553), (-6.733482579, 50.364752909), (-10.151228289, 48.958682215))
                ThreePointArc((-10.151228289, 48.958682215), (-35.355239503, 35.355438615), (-48.958625045, 10.151504012))
                ThreePointArc((-48.958625045, 10.151504012), (-50.364491386, 6.734110404), (-52.915450018, 4.060601605))
                ThreePointArc((-52.915450018, 4.060601605), (-54.998, 0), (-52.915450018, -4.060601605))
                ThreePointArc((-52.915450018, -4.060601605), (-50.364491386, -6.734110404), (-48.958625045, -10.151504012))
            make_face()
            with Locations(Location((0, -50, 0), (0, 0, 134.979742882))):
                Circle(SKETCH23_R, mode=Mode.SUBTRACT)
            with Locations(Location((50, 0, 0), (0, 0, 270))):
                Circle(SKETCH23_R, mode=Mode.SUBTRACT)
            with Locations(Location((-50, 0, 0), (0, 0, 89.971352109))):
                Circle(SKETCH23_R, mode=Mode.SUBTRACT)
            with Locations(Location((0, 50, 0), (0, 0, 44.979742883))):
                Circle(SKETCH23_R, mode=Mode.SUBTRACT)
            with BuildLine():
                ThreePointArc((-42.213853702, 18.275408495), (-44.165553177, 16.074946736), (-44.084894193, 13.134766994))
                ThreePointArc((-44.084894193, 13.134766994), (-46, 0), (-44.084894193, -13.134766994))
                ThreePointArc((-44.084894193, -13.134766994), (-44.165553177, -16.074946736), (-42.213853702, -18.275408495))
                ThreePointArc((-42.213853702, -18.275408495), (-35.238044383, -29.568230046), (-25.328122743, -38.399039029))
                ThreePointArc((-25.328122743, -38.399039029), (-23.5, -40.703193978), (-20.590481909, -41.13431724))
                ThreePointArc((-20.590481909, -41.13431724), (-7.987816173, -45.301156639), (5.27995883, -45.695973945))
                ThreePointArc((5.27995883, -45.695973945), (8.16146435, -46.285964392), (10.667405207, -44.746021791))
                ThreePointArc((10.667405207, -44.746021791), (23, -39.837168574), (33.417488986, -31.611254798))
                ThreePointArc((33.417488986, -31.611254798), (36.004088827, -30.211017655), (36.933894872, -27.42056545))
                ThreePointArc((36.933894872, -27.42056545), (43.225860556, -15.732926593), (45.918604651, -2.735278211))
                ThreePointArc((45.918604651, -2.735278211), (47, 0), (45.918604651, 2.735278211))
                ThreePointArc((45.918604651, 2.735278211), (43.225860556, 15.732926593), (36.933894872, 27.42056545))
                ThreePointArc((36.933894872, 27.42056545), (36.004088827, 30.211017655), (33.417488986, 31.611254798))
                ThreePointArc((33.417488986, 31.611254798), (23, 39.837168574), (10.667405207, 44.746021791))
                ThreePointArc((10.667405207, 44.746021791), (8.16146435, 46.285964392), (5.27995883, 45.695973945))
                ThreePointArc((5.27995883, 45.695973945), (-7.987816173, 45.301156639), (-20.590481909, 41.13431724))
                ThreePointArc((-20.590481909, 41.13431724), (-23.5, 40.703193978), (-25.328122743, 38.399039029))
                ThreePointArc((-25.328122743, 38.399039029), (-35.238044383, 29.568230046), (-42.213853702, 18.275408495))
            make_face(mode=Mode.SUBTRACT)
        extrude(amount=BOSS_EXTRUDE12_DEPTH)

    # Sketch24 → Cut-Extrude14 (cut)
    with SkipClean():  # the faces are left unmerged after this step: merging them gives an invalid solid
        with BuildSketch(Plane(origin=(0, 33, 0), x_dir=(1, 0, 0), z_dir=(0, 1, 0)).offset(CUT_EXTRUDE14_START)):
            with Locations(Location((0, 0, 0), (0, 0, 270))):
                Circle(SKETCH24_R)
            Circle(SKETCH24_R_2, mode=Mode.SUBTRACT)
        extrude(amount=CUT_EXTRUDE14_DEPTH, mode=Mode.SUBTRACT)

    # Sketch25 → Cut-Extrude15 (cut)
    with SkipClean():  # the faces are left unmerged after this step: merging them gives an invalid solid
        with BuildSketch(Plane(origin=(0, 33, 0), x_dir=(1, 0, 0), z_dir=(0, 1, 0))):
            with Locations((55, 0)):
                Rectangle(SKETCH25_W, SKETCH25_H)
        extrude(amount=-CUT_EXTRUDE15_DEPTH, mode=Mode.SUBTRACT)


solid = part.part
